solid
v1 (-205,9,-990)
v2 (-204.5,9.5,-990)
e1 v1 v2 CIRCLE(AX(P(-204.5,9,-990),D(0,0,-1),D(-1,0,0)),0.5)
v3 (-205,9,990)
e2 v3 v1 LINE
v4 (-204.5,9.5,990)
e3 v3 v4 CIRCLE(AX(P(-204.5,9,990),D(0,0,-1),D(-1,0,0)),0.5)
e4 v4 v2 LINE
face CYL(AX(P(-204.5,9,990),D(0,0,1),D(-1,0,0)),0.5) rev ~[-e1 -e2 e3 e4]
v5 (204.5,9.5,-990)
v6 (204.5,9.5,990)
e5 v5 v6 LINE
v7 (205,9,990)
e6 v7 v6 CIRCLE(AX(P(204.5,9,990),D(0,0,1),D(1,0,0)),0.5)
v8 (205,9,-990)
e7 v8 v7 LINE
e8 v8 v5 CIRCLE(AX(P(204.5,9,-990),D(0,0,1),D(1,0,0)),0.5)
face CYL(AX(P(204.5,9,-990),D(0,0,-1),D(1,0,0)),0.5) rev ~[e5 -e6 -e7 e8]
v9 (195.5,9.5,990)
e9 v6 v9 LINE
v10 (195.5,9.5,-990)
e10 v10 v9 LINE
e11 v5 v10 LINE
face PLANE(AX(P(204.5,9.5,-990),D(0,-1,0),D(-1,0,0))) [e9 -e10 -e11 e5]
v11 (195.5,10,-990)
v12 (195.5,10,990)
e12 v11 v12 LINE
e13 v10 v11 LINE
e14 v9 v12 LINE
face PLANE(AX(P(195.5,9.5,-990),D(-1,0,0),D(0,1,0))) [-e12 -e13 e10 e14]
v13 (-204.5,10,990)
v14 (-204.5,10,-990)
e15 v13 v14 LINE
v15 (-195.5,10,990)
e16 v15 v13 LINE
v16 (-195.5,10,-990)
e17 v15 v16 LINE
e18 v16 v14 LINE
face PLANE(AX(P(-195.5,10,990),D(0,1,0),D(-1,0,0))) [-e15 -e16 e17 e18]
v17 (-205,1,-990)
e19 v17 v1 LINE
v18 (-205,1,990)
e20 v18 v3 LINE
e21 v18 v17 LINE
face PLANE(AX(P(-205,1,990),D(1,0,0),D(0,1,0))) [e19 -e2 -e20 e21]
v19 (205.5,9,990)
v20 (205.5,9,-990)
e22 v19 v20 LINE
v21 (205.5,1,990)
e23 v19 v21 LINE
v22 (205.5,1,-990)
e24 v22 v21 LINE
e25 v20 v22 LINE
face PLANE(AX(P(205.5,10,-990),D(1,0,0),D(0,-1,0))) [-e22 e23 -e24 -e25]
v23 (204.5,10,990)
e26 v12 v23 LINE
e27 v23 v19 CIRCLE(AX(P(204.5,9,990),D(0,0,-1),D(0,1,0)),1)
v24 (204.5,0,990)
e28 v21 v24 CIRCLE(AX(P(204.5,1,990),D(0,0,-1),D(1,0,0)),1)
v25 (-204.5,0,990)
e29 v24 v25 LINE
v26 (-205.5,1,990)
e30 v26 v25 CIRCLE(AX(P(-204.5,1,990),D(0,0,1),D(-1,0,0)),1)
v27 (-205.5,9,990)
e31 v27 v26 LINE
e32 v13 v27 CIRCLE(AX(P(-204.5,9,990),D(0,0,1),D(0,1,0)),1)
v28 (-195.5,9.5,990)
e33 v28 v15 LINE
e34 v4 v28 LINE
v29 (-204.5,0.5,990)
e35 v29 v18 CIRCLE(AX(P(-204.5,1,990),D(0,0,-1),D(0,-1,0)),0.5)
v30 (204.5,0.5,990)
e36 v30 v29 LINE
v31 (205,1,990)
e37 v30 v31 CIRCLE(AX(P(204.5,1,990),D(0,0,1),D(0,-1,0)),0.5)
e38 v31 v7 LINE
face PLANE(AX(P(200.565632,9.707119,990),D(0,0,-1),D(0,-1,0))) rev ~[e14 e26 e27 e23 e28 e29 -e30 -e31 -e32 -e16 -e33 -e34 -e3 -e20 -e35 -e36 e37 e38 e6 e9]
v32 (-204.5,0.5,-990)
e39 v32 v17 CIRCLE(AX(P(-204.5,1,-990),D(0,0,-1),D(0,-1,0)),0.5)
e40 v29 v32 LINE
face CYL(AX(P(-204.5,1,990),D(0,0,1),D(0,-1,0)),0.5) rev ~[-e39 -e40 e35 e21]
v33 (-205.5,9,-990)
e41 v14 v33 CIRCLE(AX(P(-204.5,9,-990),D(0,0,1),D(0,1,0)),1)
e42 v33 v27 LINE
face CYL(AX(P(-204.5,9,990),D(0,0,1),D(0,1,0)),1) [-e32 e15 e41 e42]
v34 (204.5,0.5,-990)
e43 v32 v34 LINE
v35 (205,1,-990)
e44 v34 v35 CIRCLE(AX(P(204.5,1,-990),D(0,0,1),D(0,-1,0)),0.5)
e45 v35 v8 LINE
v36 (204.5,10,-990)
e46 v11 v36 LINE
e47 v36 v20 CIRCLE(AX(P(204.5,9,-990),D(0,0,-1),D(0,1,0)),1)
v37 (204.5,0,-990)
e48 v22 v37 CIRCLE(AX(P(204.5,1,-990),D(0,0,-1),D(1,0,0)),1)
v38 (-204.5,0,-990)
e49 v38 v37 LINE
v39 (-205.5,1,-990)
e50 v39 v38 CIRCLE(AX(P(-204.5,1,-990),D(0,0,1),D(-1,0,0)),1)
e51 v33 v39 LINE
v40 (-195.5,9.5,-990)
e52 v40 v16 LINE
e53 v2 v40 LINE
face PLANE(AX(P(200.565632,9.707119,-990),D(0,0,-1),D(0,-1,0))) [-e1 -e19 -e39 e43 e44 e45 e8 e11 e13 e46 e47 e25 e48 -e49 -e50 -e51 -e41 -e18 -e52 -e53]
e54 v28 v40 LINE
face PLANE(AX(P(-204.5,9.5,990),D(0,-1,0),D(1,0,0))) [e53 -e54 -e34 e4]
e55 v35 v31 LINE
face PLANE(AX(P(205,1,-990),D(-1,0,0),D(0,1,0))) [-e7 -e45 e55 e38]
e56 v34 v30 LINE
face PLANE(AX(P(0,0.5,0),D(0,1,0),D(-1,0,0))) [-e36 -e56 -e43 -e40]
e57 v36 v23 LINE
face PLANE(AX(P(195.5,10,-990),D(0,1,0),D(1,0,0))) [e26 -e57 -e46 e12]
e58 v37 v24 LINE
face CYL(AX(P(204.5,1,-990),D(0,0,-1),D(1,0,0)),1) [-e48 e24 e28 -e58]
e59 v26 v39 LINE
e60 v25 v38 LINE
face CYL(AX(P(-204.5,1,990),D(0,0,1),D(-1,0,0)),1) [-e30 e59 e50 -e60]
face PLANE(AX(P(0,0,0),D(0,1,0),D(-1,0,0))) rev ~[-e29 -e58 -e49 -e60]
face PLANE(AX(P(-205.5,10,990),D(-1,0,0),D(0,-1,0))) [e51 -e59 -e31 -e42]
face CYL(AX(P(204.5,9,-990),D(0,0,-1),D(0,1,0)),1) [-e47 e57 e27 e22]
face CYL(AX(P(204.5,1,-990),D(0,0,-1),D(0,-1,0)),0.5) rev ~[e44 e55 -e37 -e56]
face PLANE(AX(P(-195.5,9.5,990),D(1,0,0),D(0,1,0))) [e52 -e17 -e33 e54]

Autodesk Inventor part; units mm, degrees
ref_plane "YZ Plane" through (0, 0, 0) normal (1, 0, 0) x (0, 1, 0)
ref_plane "XZ Plane" through (0, 0, 0) normal (0, 1, 0) x (-1, 0, 0)
ref_plane "XY Plane" through (0, 0, 0) normal (0, 0, 1) x (1, 0, 0)
sketch "Sketch6" plane through (0, 0, 0) normal (0, 1, 0) x (-1, 0, 0)
  line L0 (205.5, -990) -> (-205.5, -990)
  line L1 (-205.5, -990) -> (-205.5, 990)
  line L2 (-205.5, 990) -> (205.5, 990)
  line L3 (205.5, 990) -> (205.5, -990)
  line L4 (205.5, -990) -> (-205.5, 990) construction
  line L5 (-205.5, -990) -> (205.5, 990) construction
  point P0 (0, 0)
  dimension "d52" = 411
  dimension "d53" = 1980
extrude "Plate2" add sketch "Sketch6" along normal blind 0.5
sketch "Sketch12" plane through (-205, 0, 990) normal (-1, 0, 0) x (0, -1, 0)
  line L0 (0, -1980) -> (0, 0)
  line L1 (0, 0) -> (-10, 0)
  line L2 (-10, 0) -> (-10, -1980)
  line L3 (-10, -1980) -> (0, -1980)
edge flange "Flange3" height 10 angle 90 thickness 0.5 bend radius 0.5 thickness toward (-1, 0, 0) relief tear relief width 0.5 relief depth 0.25 edges at (-205.5, 0.5, 0) wall of the first edge with corners at (-205, 0, -990) (-205, 0, 990) (-205, 10, 990) (-205, 10, -990)
bend "Bend4"
corner "Corner4"
sketch "Sketch13" plane through (-205.5, 9.5, 990) normal (0, 1, 0) x (-1, 0, 0)
  line L0 (0, -1980) -> (0, 0)
  line L1 (0, 0) -> (-10, 0)
  line L2 (-10, 0) -> (-10, -1980)
  line L3 (-10, -1980) -> (0, -1980)
edge flange "Flange4" height 10 angle 90 thickness 0.5 bend radius 0.5 thickness toward (0, 1, 0) relief tear relief width 0.5 relief depth 0.25 edges at (-205, 10, 0) wall of the first edge with corners at (-205.5, 9.5, -990) (-205.5, 9.5, 990) (-195.5, 9.5, 990) (-195.5, 9.5, -990)
bend "Bend5"
corner "Corner5"
sketch "Sketch14" plane through (205, 0, -990) normal (1, 0, 0) x (0, 1, 0)
  line L0 (0, 1980) -> (0, 0)
  line L1 (0, 0) -> (10, 0)
  line L2 (10, 0) -> (10, 1980)
  line L3 (10, 1980) -> (0, 1980)
edge flange "Flange5" height 10 angle 90 thickness 0.5 bend radius 0.5 thickness toward (1, 0, 0) relief tear relief width 0.5 relief depth 0.25 edges at (205.5, 0.5, 0) wall of the first edge with corners at (205, 0, 990) (205, 0, -990) (205, 10, -990) (205, 10, 990)
bend "Bend6"
corner "Corner6"
sketch "Sketch15" plane through (205.5, 9.5, -990) normal (0, 1, 0) x (-1, 0, 0)
  line L0 (0, 1980) -> (0, 0)
  line L1 (0, 0) -> (10, 0)
  line L2 (10, 0) -> (10, 1980)
  line L3 (10, 1980) -> (0, 1980)
edge flange "Flange6" height 10 angle 90 thickness 0.5 bend radius 0.5 thickness toward (0, 1, 0) relief tear relief width 0.5 relief depth 0.25 edges at (205, 10, 0) wall of the first edge with corners at (205.5, 9.5, 990) (205.5, 9.5, -990) (195.5, 9.5, -990) (195.5, 9.5, 990)
bend "Bend7"
corner "Corner7"
equation "\"d52\" = ЖАБРЫ_базовая_ширина - 5 * ЖАБРЫ_шаг_листов"
equation "\"d53\" = ЖАБРЫ_базовая_длина_дл_лист"
equation "\"d54\" = Thickness"
equation "\"d94\" = BendReliefWidth"
equation "\"d95\" = BendReliefDepth"
equation "\"d96\" = MinimumRemnant"
equation "\"d97\" = TransitionRadius"
equation "\"d100\" = BendRadius"
equation "\"d101\" = CornerReliefSize"
equation "\"d102\" = GapSize"
equation "\"d103\" = JacobiRadiusSize"
equation "\"d104\" = BendReliefWidth"
equation "\"d105\" = BendReliefDepth"
equation "\"d106\" = MinimumRemnant"
equation "\"d107\" = TransitionRadius"
equation "\"d110\" = BendRadius"
equation "\"d111\" = CornerReliefSize"
equation "\"d112\" = GapSize"
equation "\"d113\" = JacobiRadiusSize"
equation "\"d114\" = BendReliefWidth"
equation "\"d115\" = BendReliefDepth"
equation "\"d116\" = MinimumRemnant"
equation "\"d117\" = TransitionRadius"
equation "\"d120\" = BendRadius"
equation "\"d121\" = CornerReliefSize"
equation "\"d122\" = GapSize"
equation "\"d123\" = JacobiRadiusSize"
equation "\"d124\" = BendReliefWidth"
equation "\"d125\" = BendReliefDepth"
equation "\"d126\" = MinimumRemnant"
equation "\"d127\" = TransitionRadius"
equation "\"d130\" = BendRadius"
equation "\"d131\" = CornerReliefSize"
equation "\"d132\" = GapSize"
equation "\"d133\" = JacobiRadiusSize"
equation "\"BendRadius\" = Thickness"
equation "\"BendReliefWidth\" = Thickness"
equation "\"BendReliefDepth\" = 0.5 * Thickness"
equation "\"CornerReliefSize\" = 4 * Thickness"
equation "\"MinimumRemnant\" = 2 * Thickness"
equation "\"TransitionRadius\" = BendRadius"
equation "\"JacobiRadiusSize\" = BendRadius"
equation "\"GapSize\" = Thickness"
equation "\"ЖАБРЫ_базовая_ширина\" = 915"
equation "\"ЖАБРЫ_шаг_листов\" = 100.8"
equation "\"ЖАБРЫ_базовая_длина_дл_лист\" = 1980"
equation "\"Thickness\" = 0.5"
properties part number "MSC 812 sheet gills" material "Stainless Steel"
